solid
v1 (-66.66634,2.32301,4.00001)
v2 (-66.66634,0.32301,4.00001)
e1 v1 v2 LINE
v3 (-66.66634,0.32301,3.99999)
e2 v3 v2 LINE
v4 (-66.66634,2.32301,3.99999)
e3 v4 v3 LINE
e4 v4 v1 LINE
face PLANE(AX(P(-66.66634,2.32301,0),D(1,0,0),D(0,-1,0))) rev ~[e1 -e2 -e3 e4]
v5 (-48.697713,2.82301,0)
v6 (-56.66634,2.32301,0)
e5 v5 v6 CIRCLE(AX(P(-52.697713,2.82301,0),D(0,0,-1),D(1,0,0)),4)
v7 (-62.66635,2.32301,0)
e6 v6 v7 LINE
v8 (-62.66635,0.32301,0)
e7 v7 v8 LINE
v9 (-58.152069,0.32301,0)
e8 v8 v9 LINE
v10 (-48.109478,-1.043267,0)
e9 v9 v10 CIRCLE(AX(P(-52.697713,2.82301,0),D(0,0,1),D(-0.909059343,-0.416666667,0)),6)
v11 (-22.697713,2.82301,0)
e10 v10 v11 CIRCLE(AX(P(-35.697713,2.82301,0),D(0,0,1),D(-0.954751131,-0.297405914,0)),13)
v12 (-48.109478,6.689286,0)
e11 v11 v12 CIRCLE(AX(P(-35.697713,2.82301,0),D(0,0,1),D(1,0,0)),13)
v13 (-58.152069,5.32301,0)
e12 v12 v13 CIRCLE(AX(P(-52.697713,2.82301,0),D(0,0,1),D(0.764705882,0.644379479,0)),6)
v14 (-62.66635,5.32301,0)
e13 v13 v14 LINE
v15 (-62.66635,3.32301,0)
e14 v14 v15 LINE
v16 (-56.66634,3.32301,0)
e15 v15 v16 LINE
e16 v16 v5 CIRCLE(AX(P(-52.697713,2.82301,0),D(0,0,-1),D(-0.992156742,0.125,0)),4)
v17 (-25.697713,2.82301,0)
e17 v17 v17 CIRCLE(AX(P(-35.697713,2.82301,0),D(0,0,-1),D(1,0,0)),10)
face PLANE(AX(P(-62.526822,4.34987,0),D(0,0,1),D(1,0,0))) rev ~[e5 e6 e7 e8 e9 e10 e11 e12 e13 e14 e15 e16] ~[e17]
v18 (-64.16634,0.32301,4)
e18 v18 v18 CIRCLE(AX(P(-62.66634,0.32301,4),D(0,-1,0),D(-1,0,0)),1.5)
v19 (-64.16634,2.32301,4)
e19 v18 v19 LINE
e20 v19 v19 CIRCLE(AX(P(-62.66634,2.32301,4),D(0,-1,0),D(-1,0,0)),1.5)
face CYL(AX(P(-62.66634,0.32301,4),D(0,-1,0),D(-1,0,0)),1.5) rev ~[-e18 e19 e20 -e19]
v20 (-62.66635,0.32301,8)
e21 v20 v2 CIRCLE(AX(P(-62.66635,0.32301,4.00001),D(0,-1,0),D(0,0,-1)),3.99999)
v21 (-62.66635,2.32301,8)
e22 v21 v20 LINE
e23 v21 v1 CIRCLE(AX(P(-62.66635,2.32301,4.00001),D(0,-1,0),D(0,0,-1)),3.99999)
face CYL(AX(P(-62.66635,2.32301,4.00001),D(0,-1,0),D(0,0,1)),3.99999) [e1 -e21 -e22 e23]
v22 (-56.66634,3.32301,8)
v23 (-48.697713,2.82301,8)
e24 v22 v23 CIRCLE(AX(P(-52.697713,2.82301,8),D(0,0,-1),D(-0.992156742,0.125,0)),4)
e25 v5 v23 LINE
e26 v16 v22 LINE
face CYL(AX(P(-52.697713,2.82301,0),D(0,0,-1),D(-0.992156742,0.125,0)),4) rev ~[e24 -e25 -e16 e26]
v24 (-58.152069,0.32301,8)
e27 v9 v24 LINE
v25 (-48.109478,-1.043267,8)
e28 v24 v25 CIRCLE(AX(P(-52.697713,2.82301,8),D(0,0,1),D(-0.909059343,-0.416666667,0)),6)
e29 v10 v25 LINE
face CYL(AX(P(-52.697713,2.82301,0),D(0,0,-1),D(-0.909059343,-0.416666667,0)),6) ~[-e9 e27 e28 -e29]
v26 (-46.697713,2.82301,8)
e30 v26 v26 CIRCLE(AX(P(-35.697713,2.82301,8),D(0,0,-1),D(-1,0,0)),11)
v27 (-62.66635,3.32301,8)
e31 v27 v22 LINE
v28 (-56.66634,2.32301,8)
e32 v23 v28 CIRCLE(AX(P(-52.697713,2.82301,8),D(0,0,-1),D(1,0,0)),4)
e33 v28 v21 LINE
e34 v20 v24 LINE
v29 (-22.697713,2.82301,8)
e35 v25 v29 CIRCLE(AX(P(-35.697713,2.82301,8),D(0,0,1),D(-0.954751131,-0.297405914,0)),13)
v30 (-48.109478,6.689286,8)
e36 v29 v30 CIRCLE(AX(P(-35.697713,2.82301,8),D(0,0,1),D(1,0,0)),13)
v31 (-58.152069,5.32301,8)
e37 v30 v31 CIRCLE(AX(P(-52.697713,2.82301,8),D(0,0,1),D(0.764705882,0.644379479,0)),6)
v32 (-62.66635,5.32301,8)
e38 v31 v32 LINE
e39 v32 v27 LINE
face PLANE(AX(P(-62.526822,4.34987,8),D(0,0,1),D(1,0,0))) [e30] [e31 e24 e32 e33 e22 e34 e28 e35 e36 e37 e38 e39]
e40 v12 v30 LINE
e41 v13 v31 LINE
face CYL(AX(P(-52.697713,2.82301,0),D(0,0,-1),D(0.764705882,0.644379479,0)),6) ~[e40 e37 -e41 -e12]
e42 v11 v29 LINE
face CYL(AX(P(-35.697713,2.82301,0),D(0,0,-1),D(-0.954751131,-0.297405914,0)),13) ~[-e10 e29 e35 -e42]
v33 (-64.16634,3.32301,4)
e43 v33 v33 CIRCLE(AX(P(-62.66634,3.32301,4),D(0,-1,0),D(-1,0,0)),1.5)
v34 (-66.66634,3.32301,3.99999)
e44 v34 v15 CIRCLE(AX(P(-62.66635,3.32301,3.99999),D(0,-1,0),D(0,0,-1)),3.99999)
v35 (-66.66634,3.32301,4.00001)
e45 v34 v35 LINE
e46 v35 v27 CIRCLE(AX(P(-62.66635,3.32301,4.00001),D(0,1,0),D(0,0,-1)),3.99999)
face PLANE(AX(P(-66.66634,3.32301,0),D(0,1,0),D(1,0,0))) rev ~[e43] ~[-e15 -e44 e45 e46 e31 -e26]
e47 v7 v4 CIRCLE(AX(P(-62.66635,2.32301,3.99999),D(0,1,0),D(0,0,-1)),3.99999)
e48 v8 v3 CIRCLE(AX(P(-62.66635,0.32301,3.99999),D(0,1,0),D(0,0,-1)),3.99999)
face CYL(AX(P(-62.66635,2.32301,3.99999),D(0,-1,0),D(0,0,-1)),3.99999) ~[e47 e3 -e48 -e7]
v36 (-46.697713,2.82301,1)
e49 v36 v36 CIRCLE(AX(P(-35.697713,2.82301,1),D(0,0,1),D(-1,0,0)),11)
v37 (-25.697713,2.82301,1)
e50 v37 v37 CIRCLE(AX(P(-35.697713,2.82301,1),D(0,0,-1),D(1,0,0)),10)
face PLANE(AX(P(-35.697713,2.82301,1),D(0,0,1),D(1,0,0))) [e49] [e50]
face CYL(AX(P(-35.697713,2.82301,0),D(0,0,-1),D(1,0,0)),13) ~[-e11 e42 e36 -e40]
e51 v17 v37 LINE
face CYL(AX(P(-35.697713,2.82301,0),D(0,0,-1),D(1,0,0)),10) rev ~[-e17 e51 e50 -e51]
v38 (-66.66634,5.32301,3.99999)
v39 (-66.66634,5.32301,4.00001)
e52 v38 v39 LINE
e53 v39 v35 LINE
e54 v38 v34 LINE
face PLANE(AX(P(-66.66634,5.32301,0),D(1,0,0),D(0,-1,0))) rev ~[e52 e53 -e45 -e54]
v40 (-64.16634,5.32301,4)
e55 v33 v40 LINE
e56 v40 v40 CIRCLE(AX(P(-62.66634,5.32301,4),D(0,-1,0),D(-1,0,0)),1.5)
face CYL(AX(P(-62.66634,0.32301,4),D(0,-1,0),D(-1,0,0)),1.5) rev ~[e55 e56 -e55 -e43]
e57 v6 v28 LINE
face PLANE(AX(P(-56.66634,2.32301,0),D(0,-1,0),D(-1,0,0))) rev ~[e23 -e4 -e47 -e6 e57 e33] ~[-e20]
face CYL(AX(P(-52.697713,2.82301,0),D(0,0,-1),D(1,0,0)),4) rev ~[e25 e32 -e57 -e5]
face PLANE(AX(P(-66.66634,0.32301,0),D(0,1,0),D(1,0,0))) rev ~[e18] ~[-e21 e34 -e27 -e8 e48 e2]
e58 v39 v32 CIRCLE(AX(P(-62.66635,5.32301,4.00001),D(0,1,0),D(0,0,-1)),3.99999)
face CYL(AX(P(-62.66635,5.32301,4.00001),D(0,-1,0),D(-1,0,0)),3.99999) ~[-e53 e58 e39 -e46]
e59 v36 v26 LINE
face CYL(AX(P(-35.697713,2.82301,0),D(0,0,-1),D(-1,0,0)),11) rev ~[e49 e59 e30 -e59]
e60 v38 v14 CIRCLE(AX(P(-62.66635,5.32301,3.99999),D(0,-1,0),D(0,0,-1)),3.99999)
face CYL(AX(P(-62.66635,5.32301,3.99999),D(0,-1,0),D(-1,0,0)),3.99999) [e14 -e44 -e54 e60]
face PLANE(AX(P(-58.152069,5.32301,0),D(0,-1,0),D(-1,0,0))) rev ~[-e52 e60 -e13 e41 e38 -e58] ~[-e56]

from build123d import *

# Parameters (mm, degrees)
F1_DEPTH = 1
F2_DEPTH = 8
F4_R     = 3.99999
F5_DEPTH = 5


# Not quite as in the source:
# - a fillet or chamfer is up to 0.001 mm smaller than in the source, because OpenCascade refuses the exact size


with BuildPart() as f1:
    # F0 (on Top) → F1 (new body)
    with BuildSketch(Plane.XY):
        with BuildLine():
            ThreePointArc((-24.6977130771, 2.8230095394), (-35.6977130771, 13.8230095394), (-46.6977130771, 2.8230095394))
            ThreePointArc((-46.6977130771, 2.8230095394), (-35.6977130771, -8.1769904606), (-24.6977130771, 2.8230095394))
        make_face()
        with BuildLine():
            ThreePointArc((-45.6977130771, 2.8230095394), (-35.6977130771, 12.8230095394), (-25.6977130771, 2.8230095394))
            ThreePointArc((-25.6977130771, 2.8230095394), (-35.6977130771, -7.1769904606), (-45.6977130771, 2.8230095394))
        make_face(mode=Mode.SUBTRACT)
    extrude(amount=F1_DEPTH)

    # F0 (on Top) → F2 (join)
    with BuildSketch(Plane.XY):
        with BuildLine():
            ThreePointArc((-58.6768434486, 3.3230095394), (-58.5012596634, 4.3457856294), (-58.1520691344, 5.3230095394))
            Line((-58.1520691344, 5.3230095394), (-66.6663400437, 5.3230095394))
            Line((-66.6663400437, 5.3230095394), (-66.6663400437, 3.3230095394))
            Line((-66.6663400437, 3.3230095394), (-61.1977130771, 3.3230095394))
            Line((-61.1977130771, 3.3230095394), (-58.6768434486, 3.3230095394))
        make_face()
        with BuildLine():
            Line((-66.6663400437, 0.3230095394), (-58.1520691344, 0.3230095394))
            ThreePointArc((-58.1520691344, 0.3230095394), (-58.5012596634, 1.3002334494), (-58.6768434486, 2.3230095394))
            Line((-58.6768434486, 2.3230095394), (-61.1977130771, 2.3230095394))
            Line((-61.1977130771, 2.3230095394), (-66.6663400437, 2.3230095394))
            Line((-66.6663400437, 2.3230095394), (-66.6663400437, 0.3230095394))
        make_face()
        with BuildLine():
            Line((-58.6768434486, 3.3230095394), (-56.6663400437, 3.3230095394))
            Line((-56.6663400437, 3.3230095394), (-56.6663400437, 5.3230095394))
            Line((-56.6663400437, 5.3230095394), (-58.1520691344, 5.3230095394))
            ThreePointArc((-58.1520691344, 5.3230095394), (-58.5012596634, 4.3457856294), (-58.6768434486, 3.3230095394))
        make_face()
        with BuildLine():
            Line((-56.6663400437, 0.3230095394), (-56.6663400437, 2.3230095394))
            Line((-56.6663400437, 2.3230095394), (-58.6768434486, 2.3230095394))
            ThreePointArc((-58.6768434486, 2.3230095394), (-58.5012596634, 1.3002334494), (-58.1520691344, 0.3230095394))
            Line((-58.1520691344, 0.3230095394), (-56.6663400437, 0.3230095394))
        make_face()
        with BuildLine():
            ThreePointArc((-56.6663400437, 3.3230095394), (-52.4472214269, 6.8151585763), (-48.6977130771, 2.8230095394))
            ThreePointArc((-48.6977130771, 2.8230095394), (-48.5498129284, 4.7783942616), (-48.109477783, 6.6892864159))
            ThreePointArc((-48.109477783, 6.6892864159), (-53.5065513921, 8.768241291), (-58.1520691344, 5.3230095394))
            Line((-58.1520691344, 5.3230095394), (-56.6663400437, 5.3230095394))
            Line((-56.6663400437, 5.3230095394), (-56.6663400437, 3.3230095394))
        make_face()
        with BuildLine():
            ThreePointArc((-48.109477783, -1.0432673371), (-48.5498129284, 0.8676248172), (-48.6977130771, 2.8230095394))
            ThreePointArc((-48.6977130771, 2.8230095394), (-52.4472214269, -1.1691394976), (-56.6663400437, 2.3230095394))
            Line((-56.6663400437, 2.3230095394), (-56.6663400437, 0.3230095394))
            Line((-56.6663400437, 0.3230095394), (-58.1520691344, 0.3230095394))
            ThreePointArc((-58.1520691344, 0.3230095394), (-53.5065513921, -3.1222222122), (-48.109477783, -1.0432673371))
        make_face()
        with BuildLine():
            ThreePointArc((-48.109477783, 6.6892864159), (-47.0616944573, 4.8809925611), (-46.6977130771, 2.8230095394))
            ThreePointArc((-46.6977130771, 2.8230095394), (-47.0616944573, 0.7650265177), (-48.109477783, -1.0432673371))
            ThreePointArc((-48.109477783, -1.0432673371), (-33.7423283549, -10.0290903119), (-22.6977130771, 2.8230095394))
            ThreePointArc((-22.6977130771, 2.8230095394), (-33.7423283549, 15.6751093907), (-48.109477783, 6.6892864159))
        make_face()
        with BuildLine():
            ThreePointArc((-24.6977130771, 2.8230095394), (-35.6977130771, -8.1769904606), (-46.6977130771, 2.8230095394))
            ThreePointArc((-46.6977130771, 2.8230095394), (-35.6977130771, 13.8230095394), (-24.6977130771, 2.8230095394))
        make_face(mode=Mode.SUBTRACT)
        with BuildLine():
            ThreePointArc((-48.109477783, -1.0432673371), (-47.0616944573, 0.7650265177), (-46.6977130771, 2.8230095394))
            Line((-46.6977130771, 2.8230095394), (-48.6977130771, 2.8230095394))
            ThreePointArc((-48.6977130771, 2.8230095394), (-48.5498129284, 0.8676248172), (-48.109477783, -1.0432673371))
        make_face()
        with BuildLine():
            Line((-48.6977130771, 2.8230095394), (-46.6977130771, 2.8230095394))
            ThreePointArc((-46.6977130771, 2.8230095394), (-47.0616944573, 4.8809925611), (-48.109477783, 6.6892864159))
            ThreePointArc((-48.109477783, 6.6892864159), (-48.5498129284, 4.7783942616), (-48.6977130771, 2.8230095394))
        make_face()
    extrude(amount=F2_DEPTH)

    # F4 (radius 4 in the source; OpenCascade refuses exactly that, so slightly less here)
    f4_edges = [f1.edges().sort_by_distance(p)[0] for p in [
        (-66.66634, 4.32301, 8),
        (-66.66634, 1.32301, 8),
        (-66.66634, 4.32301, 0),
        (-66.66634, 1.32301, 0),
    ]]
    fillet(f4_edges, radius=F4_R)

    # F3 (on face) → F5 (cut)
    with BuildSketch(Plane.XZ.offset(-0.3230095394)):
        with BuildLine():
            Line((-64.1663400437, 4), (-61.1663400437, 4))
            ThreePointArc((-61.1663400437, 4), (-62.6663400437, 5.5), (-64.1663400437, 4))
        make_face()
        with BuildLine():
            ThreePointArc((-64.1663400437, 4), (-62.6663400437, 2.5), (-61.1663400437, 4))
            Line((-61.1663400437, 4), (-64.1663400437, 4))
        make_face()
    extrude(amount=-F5_DEPTH, mode=Mode.SUBTRACT)


solid = f1.part
